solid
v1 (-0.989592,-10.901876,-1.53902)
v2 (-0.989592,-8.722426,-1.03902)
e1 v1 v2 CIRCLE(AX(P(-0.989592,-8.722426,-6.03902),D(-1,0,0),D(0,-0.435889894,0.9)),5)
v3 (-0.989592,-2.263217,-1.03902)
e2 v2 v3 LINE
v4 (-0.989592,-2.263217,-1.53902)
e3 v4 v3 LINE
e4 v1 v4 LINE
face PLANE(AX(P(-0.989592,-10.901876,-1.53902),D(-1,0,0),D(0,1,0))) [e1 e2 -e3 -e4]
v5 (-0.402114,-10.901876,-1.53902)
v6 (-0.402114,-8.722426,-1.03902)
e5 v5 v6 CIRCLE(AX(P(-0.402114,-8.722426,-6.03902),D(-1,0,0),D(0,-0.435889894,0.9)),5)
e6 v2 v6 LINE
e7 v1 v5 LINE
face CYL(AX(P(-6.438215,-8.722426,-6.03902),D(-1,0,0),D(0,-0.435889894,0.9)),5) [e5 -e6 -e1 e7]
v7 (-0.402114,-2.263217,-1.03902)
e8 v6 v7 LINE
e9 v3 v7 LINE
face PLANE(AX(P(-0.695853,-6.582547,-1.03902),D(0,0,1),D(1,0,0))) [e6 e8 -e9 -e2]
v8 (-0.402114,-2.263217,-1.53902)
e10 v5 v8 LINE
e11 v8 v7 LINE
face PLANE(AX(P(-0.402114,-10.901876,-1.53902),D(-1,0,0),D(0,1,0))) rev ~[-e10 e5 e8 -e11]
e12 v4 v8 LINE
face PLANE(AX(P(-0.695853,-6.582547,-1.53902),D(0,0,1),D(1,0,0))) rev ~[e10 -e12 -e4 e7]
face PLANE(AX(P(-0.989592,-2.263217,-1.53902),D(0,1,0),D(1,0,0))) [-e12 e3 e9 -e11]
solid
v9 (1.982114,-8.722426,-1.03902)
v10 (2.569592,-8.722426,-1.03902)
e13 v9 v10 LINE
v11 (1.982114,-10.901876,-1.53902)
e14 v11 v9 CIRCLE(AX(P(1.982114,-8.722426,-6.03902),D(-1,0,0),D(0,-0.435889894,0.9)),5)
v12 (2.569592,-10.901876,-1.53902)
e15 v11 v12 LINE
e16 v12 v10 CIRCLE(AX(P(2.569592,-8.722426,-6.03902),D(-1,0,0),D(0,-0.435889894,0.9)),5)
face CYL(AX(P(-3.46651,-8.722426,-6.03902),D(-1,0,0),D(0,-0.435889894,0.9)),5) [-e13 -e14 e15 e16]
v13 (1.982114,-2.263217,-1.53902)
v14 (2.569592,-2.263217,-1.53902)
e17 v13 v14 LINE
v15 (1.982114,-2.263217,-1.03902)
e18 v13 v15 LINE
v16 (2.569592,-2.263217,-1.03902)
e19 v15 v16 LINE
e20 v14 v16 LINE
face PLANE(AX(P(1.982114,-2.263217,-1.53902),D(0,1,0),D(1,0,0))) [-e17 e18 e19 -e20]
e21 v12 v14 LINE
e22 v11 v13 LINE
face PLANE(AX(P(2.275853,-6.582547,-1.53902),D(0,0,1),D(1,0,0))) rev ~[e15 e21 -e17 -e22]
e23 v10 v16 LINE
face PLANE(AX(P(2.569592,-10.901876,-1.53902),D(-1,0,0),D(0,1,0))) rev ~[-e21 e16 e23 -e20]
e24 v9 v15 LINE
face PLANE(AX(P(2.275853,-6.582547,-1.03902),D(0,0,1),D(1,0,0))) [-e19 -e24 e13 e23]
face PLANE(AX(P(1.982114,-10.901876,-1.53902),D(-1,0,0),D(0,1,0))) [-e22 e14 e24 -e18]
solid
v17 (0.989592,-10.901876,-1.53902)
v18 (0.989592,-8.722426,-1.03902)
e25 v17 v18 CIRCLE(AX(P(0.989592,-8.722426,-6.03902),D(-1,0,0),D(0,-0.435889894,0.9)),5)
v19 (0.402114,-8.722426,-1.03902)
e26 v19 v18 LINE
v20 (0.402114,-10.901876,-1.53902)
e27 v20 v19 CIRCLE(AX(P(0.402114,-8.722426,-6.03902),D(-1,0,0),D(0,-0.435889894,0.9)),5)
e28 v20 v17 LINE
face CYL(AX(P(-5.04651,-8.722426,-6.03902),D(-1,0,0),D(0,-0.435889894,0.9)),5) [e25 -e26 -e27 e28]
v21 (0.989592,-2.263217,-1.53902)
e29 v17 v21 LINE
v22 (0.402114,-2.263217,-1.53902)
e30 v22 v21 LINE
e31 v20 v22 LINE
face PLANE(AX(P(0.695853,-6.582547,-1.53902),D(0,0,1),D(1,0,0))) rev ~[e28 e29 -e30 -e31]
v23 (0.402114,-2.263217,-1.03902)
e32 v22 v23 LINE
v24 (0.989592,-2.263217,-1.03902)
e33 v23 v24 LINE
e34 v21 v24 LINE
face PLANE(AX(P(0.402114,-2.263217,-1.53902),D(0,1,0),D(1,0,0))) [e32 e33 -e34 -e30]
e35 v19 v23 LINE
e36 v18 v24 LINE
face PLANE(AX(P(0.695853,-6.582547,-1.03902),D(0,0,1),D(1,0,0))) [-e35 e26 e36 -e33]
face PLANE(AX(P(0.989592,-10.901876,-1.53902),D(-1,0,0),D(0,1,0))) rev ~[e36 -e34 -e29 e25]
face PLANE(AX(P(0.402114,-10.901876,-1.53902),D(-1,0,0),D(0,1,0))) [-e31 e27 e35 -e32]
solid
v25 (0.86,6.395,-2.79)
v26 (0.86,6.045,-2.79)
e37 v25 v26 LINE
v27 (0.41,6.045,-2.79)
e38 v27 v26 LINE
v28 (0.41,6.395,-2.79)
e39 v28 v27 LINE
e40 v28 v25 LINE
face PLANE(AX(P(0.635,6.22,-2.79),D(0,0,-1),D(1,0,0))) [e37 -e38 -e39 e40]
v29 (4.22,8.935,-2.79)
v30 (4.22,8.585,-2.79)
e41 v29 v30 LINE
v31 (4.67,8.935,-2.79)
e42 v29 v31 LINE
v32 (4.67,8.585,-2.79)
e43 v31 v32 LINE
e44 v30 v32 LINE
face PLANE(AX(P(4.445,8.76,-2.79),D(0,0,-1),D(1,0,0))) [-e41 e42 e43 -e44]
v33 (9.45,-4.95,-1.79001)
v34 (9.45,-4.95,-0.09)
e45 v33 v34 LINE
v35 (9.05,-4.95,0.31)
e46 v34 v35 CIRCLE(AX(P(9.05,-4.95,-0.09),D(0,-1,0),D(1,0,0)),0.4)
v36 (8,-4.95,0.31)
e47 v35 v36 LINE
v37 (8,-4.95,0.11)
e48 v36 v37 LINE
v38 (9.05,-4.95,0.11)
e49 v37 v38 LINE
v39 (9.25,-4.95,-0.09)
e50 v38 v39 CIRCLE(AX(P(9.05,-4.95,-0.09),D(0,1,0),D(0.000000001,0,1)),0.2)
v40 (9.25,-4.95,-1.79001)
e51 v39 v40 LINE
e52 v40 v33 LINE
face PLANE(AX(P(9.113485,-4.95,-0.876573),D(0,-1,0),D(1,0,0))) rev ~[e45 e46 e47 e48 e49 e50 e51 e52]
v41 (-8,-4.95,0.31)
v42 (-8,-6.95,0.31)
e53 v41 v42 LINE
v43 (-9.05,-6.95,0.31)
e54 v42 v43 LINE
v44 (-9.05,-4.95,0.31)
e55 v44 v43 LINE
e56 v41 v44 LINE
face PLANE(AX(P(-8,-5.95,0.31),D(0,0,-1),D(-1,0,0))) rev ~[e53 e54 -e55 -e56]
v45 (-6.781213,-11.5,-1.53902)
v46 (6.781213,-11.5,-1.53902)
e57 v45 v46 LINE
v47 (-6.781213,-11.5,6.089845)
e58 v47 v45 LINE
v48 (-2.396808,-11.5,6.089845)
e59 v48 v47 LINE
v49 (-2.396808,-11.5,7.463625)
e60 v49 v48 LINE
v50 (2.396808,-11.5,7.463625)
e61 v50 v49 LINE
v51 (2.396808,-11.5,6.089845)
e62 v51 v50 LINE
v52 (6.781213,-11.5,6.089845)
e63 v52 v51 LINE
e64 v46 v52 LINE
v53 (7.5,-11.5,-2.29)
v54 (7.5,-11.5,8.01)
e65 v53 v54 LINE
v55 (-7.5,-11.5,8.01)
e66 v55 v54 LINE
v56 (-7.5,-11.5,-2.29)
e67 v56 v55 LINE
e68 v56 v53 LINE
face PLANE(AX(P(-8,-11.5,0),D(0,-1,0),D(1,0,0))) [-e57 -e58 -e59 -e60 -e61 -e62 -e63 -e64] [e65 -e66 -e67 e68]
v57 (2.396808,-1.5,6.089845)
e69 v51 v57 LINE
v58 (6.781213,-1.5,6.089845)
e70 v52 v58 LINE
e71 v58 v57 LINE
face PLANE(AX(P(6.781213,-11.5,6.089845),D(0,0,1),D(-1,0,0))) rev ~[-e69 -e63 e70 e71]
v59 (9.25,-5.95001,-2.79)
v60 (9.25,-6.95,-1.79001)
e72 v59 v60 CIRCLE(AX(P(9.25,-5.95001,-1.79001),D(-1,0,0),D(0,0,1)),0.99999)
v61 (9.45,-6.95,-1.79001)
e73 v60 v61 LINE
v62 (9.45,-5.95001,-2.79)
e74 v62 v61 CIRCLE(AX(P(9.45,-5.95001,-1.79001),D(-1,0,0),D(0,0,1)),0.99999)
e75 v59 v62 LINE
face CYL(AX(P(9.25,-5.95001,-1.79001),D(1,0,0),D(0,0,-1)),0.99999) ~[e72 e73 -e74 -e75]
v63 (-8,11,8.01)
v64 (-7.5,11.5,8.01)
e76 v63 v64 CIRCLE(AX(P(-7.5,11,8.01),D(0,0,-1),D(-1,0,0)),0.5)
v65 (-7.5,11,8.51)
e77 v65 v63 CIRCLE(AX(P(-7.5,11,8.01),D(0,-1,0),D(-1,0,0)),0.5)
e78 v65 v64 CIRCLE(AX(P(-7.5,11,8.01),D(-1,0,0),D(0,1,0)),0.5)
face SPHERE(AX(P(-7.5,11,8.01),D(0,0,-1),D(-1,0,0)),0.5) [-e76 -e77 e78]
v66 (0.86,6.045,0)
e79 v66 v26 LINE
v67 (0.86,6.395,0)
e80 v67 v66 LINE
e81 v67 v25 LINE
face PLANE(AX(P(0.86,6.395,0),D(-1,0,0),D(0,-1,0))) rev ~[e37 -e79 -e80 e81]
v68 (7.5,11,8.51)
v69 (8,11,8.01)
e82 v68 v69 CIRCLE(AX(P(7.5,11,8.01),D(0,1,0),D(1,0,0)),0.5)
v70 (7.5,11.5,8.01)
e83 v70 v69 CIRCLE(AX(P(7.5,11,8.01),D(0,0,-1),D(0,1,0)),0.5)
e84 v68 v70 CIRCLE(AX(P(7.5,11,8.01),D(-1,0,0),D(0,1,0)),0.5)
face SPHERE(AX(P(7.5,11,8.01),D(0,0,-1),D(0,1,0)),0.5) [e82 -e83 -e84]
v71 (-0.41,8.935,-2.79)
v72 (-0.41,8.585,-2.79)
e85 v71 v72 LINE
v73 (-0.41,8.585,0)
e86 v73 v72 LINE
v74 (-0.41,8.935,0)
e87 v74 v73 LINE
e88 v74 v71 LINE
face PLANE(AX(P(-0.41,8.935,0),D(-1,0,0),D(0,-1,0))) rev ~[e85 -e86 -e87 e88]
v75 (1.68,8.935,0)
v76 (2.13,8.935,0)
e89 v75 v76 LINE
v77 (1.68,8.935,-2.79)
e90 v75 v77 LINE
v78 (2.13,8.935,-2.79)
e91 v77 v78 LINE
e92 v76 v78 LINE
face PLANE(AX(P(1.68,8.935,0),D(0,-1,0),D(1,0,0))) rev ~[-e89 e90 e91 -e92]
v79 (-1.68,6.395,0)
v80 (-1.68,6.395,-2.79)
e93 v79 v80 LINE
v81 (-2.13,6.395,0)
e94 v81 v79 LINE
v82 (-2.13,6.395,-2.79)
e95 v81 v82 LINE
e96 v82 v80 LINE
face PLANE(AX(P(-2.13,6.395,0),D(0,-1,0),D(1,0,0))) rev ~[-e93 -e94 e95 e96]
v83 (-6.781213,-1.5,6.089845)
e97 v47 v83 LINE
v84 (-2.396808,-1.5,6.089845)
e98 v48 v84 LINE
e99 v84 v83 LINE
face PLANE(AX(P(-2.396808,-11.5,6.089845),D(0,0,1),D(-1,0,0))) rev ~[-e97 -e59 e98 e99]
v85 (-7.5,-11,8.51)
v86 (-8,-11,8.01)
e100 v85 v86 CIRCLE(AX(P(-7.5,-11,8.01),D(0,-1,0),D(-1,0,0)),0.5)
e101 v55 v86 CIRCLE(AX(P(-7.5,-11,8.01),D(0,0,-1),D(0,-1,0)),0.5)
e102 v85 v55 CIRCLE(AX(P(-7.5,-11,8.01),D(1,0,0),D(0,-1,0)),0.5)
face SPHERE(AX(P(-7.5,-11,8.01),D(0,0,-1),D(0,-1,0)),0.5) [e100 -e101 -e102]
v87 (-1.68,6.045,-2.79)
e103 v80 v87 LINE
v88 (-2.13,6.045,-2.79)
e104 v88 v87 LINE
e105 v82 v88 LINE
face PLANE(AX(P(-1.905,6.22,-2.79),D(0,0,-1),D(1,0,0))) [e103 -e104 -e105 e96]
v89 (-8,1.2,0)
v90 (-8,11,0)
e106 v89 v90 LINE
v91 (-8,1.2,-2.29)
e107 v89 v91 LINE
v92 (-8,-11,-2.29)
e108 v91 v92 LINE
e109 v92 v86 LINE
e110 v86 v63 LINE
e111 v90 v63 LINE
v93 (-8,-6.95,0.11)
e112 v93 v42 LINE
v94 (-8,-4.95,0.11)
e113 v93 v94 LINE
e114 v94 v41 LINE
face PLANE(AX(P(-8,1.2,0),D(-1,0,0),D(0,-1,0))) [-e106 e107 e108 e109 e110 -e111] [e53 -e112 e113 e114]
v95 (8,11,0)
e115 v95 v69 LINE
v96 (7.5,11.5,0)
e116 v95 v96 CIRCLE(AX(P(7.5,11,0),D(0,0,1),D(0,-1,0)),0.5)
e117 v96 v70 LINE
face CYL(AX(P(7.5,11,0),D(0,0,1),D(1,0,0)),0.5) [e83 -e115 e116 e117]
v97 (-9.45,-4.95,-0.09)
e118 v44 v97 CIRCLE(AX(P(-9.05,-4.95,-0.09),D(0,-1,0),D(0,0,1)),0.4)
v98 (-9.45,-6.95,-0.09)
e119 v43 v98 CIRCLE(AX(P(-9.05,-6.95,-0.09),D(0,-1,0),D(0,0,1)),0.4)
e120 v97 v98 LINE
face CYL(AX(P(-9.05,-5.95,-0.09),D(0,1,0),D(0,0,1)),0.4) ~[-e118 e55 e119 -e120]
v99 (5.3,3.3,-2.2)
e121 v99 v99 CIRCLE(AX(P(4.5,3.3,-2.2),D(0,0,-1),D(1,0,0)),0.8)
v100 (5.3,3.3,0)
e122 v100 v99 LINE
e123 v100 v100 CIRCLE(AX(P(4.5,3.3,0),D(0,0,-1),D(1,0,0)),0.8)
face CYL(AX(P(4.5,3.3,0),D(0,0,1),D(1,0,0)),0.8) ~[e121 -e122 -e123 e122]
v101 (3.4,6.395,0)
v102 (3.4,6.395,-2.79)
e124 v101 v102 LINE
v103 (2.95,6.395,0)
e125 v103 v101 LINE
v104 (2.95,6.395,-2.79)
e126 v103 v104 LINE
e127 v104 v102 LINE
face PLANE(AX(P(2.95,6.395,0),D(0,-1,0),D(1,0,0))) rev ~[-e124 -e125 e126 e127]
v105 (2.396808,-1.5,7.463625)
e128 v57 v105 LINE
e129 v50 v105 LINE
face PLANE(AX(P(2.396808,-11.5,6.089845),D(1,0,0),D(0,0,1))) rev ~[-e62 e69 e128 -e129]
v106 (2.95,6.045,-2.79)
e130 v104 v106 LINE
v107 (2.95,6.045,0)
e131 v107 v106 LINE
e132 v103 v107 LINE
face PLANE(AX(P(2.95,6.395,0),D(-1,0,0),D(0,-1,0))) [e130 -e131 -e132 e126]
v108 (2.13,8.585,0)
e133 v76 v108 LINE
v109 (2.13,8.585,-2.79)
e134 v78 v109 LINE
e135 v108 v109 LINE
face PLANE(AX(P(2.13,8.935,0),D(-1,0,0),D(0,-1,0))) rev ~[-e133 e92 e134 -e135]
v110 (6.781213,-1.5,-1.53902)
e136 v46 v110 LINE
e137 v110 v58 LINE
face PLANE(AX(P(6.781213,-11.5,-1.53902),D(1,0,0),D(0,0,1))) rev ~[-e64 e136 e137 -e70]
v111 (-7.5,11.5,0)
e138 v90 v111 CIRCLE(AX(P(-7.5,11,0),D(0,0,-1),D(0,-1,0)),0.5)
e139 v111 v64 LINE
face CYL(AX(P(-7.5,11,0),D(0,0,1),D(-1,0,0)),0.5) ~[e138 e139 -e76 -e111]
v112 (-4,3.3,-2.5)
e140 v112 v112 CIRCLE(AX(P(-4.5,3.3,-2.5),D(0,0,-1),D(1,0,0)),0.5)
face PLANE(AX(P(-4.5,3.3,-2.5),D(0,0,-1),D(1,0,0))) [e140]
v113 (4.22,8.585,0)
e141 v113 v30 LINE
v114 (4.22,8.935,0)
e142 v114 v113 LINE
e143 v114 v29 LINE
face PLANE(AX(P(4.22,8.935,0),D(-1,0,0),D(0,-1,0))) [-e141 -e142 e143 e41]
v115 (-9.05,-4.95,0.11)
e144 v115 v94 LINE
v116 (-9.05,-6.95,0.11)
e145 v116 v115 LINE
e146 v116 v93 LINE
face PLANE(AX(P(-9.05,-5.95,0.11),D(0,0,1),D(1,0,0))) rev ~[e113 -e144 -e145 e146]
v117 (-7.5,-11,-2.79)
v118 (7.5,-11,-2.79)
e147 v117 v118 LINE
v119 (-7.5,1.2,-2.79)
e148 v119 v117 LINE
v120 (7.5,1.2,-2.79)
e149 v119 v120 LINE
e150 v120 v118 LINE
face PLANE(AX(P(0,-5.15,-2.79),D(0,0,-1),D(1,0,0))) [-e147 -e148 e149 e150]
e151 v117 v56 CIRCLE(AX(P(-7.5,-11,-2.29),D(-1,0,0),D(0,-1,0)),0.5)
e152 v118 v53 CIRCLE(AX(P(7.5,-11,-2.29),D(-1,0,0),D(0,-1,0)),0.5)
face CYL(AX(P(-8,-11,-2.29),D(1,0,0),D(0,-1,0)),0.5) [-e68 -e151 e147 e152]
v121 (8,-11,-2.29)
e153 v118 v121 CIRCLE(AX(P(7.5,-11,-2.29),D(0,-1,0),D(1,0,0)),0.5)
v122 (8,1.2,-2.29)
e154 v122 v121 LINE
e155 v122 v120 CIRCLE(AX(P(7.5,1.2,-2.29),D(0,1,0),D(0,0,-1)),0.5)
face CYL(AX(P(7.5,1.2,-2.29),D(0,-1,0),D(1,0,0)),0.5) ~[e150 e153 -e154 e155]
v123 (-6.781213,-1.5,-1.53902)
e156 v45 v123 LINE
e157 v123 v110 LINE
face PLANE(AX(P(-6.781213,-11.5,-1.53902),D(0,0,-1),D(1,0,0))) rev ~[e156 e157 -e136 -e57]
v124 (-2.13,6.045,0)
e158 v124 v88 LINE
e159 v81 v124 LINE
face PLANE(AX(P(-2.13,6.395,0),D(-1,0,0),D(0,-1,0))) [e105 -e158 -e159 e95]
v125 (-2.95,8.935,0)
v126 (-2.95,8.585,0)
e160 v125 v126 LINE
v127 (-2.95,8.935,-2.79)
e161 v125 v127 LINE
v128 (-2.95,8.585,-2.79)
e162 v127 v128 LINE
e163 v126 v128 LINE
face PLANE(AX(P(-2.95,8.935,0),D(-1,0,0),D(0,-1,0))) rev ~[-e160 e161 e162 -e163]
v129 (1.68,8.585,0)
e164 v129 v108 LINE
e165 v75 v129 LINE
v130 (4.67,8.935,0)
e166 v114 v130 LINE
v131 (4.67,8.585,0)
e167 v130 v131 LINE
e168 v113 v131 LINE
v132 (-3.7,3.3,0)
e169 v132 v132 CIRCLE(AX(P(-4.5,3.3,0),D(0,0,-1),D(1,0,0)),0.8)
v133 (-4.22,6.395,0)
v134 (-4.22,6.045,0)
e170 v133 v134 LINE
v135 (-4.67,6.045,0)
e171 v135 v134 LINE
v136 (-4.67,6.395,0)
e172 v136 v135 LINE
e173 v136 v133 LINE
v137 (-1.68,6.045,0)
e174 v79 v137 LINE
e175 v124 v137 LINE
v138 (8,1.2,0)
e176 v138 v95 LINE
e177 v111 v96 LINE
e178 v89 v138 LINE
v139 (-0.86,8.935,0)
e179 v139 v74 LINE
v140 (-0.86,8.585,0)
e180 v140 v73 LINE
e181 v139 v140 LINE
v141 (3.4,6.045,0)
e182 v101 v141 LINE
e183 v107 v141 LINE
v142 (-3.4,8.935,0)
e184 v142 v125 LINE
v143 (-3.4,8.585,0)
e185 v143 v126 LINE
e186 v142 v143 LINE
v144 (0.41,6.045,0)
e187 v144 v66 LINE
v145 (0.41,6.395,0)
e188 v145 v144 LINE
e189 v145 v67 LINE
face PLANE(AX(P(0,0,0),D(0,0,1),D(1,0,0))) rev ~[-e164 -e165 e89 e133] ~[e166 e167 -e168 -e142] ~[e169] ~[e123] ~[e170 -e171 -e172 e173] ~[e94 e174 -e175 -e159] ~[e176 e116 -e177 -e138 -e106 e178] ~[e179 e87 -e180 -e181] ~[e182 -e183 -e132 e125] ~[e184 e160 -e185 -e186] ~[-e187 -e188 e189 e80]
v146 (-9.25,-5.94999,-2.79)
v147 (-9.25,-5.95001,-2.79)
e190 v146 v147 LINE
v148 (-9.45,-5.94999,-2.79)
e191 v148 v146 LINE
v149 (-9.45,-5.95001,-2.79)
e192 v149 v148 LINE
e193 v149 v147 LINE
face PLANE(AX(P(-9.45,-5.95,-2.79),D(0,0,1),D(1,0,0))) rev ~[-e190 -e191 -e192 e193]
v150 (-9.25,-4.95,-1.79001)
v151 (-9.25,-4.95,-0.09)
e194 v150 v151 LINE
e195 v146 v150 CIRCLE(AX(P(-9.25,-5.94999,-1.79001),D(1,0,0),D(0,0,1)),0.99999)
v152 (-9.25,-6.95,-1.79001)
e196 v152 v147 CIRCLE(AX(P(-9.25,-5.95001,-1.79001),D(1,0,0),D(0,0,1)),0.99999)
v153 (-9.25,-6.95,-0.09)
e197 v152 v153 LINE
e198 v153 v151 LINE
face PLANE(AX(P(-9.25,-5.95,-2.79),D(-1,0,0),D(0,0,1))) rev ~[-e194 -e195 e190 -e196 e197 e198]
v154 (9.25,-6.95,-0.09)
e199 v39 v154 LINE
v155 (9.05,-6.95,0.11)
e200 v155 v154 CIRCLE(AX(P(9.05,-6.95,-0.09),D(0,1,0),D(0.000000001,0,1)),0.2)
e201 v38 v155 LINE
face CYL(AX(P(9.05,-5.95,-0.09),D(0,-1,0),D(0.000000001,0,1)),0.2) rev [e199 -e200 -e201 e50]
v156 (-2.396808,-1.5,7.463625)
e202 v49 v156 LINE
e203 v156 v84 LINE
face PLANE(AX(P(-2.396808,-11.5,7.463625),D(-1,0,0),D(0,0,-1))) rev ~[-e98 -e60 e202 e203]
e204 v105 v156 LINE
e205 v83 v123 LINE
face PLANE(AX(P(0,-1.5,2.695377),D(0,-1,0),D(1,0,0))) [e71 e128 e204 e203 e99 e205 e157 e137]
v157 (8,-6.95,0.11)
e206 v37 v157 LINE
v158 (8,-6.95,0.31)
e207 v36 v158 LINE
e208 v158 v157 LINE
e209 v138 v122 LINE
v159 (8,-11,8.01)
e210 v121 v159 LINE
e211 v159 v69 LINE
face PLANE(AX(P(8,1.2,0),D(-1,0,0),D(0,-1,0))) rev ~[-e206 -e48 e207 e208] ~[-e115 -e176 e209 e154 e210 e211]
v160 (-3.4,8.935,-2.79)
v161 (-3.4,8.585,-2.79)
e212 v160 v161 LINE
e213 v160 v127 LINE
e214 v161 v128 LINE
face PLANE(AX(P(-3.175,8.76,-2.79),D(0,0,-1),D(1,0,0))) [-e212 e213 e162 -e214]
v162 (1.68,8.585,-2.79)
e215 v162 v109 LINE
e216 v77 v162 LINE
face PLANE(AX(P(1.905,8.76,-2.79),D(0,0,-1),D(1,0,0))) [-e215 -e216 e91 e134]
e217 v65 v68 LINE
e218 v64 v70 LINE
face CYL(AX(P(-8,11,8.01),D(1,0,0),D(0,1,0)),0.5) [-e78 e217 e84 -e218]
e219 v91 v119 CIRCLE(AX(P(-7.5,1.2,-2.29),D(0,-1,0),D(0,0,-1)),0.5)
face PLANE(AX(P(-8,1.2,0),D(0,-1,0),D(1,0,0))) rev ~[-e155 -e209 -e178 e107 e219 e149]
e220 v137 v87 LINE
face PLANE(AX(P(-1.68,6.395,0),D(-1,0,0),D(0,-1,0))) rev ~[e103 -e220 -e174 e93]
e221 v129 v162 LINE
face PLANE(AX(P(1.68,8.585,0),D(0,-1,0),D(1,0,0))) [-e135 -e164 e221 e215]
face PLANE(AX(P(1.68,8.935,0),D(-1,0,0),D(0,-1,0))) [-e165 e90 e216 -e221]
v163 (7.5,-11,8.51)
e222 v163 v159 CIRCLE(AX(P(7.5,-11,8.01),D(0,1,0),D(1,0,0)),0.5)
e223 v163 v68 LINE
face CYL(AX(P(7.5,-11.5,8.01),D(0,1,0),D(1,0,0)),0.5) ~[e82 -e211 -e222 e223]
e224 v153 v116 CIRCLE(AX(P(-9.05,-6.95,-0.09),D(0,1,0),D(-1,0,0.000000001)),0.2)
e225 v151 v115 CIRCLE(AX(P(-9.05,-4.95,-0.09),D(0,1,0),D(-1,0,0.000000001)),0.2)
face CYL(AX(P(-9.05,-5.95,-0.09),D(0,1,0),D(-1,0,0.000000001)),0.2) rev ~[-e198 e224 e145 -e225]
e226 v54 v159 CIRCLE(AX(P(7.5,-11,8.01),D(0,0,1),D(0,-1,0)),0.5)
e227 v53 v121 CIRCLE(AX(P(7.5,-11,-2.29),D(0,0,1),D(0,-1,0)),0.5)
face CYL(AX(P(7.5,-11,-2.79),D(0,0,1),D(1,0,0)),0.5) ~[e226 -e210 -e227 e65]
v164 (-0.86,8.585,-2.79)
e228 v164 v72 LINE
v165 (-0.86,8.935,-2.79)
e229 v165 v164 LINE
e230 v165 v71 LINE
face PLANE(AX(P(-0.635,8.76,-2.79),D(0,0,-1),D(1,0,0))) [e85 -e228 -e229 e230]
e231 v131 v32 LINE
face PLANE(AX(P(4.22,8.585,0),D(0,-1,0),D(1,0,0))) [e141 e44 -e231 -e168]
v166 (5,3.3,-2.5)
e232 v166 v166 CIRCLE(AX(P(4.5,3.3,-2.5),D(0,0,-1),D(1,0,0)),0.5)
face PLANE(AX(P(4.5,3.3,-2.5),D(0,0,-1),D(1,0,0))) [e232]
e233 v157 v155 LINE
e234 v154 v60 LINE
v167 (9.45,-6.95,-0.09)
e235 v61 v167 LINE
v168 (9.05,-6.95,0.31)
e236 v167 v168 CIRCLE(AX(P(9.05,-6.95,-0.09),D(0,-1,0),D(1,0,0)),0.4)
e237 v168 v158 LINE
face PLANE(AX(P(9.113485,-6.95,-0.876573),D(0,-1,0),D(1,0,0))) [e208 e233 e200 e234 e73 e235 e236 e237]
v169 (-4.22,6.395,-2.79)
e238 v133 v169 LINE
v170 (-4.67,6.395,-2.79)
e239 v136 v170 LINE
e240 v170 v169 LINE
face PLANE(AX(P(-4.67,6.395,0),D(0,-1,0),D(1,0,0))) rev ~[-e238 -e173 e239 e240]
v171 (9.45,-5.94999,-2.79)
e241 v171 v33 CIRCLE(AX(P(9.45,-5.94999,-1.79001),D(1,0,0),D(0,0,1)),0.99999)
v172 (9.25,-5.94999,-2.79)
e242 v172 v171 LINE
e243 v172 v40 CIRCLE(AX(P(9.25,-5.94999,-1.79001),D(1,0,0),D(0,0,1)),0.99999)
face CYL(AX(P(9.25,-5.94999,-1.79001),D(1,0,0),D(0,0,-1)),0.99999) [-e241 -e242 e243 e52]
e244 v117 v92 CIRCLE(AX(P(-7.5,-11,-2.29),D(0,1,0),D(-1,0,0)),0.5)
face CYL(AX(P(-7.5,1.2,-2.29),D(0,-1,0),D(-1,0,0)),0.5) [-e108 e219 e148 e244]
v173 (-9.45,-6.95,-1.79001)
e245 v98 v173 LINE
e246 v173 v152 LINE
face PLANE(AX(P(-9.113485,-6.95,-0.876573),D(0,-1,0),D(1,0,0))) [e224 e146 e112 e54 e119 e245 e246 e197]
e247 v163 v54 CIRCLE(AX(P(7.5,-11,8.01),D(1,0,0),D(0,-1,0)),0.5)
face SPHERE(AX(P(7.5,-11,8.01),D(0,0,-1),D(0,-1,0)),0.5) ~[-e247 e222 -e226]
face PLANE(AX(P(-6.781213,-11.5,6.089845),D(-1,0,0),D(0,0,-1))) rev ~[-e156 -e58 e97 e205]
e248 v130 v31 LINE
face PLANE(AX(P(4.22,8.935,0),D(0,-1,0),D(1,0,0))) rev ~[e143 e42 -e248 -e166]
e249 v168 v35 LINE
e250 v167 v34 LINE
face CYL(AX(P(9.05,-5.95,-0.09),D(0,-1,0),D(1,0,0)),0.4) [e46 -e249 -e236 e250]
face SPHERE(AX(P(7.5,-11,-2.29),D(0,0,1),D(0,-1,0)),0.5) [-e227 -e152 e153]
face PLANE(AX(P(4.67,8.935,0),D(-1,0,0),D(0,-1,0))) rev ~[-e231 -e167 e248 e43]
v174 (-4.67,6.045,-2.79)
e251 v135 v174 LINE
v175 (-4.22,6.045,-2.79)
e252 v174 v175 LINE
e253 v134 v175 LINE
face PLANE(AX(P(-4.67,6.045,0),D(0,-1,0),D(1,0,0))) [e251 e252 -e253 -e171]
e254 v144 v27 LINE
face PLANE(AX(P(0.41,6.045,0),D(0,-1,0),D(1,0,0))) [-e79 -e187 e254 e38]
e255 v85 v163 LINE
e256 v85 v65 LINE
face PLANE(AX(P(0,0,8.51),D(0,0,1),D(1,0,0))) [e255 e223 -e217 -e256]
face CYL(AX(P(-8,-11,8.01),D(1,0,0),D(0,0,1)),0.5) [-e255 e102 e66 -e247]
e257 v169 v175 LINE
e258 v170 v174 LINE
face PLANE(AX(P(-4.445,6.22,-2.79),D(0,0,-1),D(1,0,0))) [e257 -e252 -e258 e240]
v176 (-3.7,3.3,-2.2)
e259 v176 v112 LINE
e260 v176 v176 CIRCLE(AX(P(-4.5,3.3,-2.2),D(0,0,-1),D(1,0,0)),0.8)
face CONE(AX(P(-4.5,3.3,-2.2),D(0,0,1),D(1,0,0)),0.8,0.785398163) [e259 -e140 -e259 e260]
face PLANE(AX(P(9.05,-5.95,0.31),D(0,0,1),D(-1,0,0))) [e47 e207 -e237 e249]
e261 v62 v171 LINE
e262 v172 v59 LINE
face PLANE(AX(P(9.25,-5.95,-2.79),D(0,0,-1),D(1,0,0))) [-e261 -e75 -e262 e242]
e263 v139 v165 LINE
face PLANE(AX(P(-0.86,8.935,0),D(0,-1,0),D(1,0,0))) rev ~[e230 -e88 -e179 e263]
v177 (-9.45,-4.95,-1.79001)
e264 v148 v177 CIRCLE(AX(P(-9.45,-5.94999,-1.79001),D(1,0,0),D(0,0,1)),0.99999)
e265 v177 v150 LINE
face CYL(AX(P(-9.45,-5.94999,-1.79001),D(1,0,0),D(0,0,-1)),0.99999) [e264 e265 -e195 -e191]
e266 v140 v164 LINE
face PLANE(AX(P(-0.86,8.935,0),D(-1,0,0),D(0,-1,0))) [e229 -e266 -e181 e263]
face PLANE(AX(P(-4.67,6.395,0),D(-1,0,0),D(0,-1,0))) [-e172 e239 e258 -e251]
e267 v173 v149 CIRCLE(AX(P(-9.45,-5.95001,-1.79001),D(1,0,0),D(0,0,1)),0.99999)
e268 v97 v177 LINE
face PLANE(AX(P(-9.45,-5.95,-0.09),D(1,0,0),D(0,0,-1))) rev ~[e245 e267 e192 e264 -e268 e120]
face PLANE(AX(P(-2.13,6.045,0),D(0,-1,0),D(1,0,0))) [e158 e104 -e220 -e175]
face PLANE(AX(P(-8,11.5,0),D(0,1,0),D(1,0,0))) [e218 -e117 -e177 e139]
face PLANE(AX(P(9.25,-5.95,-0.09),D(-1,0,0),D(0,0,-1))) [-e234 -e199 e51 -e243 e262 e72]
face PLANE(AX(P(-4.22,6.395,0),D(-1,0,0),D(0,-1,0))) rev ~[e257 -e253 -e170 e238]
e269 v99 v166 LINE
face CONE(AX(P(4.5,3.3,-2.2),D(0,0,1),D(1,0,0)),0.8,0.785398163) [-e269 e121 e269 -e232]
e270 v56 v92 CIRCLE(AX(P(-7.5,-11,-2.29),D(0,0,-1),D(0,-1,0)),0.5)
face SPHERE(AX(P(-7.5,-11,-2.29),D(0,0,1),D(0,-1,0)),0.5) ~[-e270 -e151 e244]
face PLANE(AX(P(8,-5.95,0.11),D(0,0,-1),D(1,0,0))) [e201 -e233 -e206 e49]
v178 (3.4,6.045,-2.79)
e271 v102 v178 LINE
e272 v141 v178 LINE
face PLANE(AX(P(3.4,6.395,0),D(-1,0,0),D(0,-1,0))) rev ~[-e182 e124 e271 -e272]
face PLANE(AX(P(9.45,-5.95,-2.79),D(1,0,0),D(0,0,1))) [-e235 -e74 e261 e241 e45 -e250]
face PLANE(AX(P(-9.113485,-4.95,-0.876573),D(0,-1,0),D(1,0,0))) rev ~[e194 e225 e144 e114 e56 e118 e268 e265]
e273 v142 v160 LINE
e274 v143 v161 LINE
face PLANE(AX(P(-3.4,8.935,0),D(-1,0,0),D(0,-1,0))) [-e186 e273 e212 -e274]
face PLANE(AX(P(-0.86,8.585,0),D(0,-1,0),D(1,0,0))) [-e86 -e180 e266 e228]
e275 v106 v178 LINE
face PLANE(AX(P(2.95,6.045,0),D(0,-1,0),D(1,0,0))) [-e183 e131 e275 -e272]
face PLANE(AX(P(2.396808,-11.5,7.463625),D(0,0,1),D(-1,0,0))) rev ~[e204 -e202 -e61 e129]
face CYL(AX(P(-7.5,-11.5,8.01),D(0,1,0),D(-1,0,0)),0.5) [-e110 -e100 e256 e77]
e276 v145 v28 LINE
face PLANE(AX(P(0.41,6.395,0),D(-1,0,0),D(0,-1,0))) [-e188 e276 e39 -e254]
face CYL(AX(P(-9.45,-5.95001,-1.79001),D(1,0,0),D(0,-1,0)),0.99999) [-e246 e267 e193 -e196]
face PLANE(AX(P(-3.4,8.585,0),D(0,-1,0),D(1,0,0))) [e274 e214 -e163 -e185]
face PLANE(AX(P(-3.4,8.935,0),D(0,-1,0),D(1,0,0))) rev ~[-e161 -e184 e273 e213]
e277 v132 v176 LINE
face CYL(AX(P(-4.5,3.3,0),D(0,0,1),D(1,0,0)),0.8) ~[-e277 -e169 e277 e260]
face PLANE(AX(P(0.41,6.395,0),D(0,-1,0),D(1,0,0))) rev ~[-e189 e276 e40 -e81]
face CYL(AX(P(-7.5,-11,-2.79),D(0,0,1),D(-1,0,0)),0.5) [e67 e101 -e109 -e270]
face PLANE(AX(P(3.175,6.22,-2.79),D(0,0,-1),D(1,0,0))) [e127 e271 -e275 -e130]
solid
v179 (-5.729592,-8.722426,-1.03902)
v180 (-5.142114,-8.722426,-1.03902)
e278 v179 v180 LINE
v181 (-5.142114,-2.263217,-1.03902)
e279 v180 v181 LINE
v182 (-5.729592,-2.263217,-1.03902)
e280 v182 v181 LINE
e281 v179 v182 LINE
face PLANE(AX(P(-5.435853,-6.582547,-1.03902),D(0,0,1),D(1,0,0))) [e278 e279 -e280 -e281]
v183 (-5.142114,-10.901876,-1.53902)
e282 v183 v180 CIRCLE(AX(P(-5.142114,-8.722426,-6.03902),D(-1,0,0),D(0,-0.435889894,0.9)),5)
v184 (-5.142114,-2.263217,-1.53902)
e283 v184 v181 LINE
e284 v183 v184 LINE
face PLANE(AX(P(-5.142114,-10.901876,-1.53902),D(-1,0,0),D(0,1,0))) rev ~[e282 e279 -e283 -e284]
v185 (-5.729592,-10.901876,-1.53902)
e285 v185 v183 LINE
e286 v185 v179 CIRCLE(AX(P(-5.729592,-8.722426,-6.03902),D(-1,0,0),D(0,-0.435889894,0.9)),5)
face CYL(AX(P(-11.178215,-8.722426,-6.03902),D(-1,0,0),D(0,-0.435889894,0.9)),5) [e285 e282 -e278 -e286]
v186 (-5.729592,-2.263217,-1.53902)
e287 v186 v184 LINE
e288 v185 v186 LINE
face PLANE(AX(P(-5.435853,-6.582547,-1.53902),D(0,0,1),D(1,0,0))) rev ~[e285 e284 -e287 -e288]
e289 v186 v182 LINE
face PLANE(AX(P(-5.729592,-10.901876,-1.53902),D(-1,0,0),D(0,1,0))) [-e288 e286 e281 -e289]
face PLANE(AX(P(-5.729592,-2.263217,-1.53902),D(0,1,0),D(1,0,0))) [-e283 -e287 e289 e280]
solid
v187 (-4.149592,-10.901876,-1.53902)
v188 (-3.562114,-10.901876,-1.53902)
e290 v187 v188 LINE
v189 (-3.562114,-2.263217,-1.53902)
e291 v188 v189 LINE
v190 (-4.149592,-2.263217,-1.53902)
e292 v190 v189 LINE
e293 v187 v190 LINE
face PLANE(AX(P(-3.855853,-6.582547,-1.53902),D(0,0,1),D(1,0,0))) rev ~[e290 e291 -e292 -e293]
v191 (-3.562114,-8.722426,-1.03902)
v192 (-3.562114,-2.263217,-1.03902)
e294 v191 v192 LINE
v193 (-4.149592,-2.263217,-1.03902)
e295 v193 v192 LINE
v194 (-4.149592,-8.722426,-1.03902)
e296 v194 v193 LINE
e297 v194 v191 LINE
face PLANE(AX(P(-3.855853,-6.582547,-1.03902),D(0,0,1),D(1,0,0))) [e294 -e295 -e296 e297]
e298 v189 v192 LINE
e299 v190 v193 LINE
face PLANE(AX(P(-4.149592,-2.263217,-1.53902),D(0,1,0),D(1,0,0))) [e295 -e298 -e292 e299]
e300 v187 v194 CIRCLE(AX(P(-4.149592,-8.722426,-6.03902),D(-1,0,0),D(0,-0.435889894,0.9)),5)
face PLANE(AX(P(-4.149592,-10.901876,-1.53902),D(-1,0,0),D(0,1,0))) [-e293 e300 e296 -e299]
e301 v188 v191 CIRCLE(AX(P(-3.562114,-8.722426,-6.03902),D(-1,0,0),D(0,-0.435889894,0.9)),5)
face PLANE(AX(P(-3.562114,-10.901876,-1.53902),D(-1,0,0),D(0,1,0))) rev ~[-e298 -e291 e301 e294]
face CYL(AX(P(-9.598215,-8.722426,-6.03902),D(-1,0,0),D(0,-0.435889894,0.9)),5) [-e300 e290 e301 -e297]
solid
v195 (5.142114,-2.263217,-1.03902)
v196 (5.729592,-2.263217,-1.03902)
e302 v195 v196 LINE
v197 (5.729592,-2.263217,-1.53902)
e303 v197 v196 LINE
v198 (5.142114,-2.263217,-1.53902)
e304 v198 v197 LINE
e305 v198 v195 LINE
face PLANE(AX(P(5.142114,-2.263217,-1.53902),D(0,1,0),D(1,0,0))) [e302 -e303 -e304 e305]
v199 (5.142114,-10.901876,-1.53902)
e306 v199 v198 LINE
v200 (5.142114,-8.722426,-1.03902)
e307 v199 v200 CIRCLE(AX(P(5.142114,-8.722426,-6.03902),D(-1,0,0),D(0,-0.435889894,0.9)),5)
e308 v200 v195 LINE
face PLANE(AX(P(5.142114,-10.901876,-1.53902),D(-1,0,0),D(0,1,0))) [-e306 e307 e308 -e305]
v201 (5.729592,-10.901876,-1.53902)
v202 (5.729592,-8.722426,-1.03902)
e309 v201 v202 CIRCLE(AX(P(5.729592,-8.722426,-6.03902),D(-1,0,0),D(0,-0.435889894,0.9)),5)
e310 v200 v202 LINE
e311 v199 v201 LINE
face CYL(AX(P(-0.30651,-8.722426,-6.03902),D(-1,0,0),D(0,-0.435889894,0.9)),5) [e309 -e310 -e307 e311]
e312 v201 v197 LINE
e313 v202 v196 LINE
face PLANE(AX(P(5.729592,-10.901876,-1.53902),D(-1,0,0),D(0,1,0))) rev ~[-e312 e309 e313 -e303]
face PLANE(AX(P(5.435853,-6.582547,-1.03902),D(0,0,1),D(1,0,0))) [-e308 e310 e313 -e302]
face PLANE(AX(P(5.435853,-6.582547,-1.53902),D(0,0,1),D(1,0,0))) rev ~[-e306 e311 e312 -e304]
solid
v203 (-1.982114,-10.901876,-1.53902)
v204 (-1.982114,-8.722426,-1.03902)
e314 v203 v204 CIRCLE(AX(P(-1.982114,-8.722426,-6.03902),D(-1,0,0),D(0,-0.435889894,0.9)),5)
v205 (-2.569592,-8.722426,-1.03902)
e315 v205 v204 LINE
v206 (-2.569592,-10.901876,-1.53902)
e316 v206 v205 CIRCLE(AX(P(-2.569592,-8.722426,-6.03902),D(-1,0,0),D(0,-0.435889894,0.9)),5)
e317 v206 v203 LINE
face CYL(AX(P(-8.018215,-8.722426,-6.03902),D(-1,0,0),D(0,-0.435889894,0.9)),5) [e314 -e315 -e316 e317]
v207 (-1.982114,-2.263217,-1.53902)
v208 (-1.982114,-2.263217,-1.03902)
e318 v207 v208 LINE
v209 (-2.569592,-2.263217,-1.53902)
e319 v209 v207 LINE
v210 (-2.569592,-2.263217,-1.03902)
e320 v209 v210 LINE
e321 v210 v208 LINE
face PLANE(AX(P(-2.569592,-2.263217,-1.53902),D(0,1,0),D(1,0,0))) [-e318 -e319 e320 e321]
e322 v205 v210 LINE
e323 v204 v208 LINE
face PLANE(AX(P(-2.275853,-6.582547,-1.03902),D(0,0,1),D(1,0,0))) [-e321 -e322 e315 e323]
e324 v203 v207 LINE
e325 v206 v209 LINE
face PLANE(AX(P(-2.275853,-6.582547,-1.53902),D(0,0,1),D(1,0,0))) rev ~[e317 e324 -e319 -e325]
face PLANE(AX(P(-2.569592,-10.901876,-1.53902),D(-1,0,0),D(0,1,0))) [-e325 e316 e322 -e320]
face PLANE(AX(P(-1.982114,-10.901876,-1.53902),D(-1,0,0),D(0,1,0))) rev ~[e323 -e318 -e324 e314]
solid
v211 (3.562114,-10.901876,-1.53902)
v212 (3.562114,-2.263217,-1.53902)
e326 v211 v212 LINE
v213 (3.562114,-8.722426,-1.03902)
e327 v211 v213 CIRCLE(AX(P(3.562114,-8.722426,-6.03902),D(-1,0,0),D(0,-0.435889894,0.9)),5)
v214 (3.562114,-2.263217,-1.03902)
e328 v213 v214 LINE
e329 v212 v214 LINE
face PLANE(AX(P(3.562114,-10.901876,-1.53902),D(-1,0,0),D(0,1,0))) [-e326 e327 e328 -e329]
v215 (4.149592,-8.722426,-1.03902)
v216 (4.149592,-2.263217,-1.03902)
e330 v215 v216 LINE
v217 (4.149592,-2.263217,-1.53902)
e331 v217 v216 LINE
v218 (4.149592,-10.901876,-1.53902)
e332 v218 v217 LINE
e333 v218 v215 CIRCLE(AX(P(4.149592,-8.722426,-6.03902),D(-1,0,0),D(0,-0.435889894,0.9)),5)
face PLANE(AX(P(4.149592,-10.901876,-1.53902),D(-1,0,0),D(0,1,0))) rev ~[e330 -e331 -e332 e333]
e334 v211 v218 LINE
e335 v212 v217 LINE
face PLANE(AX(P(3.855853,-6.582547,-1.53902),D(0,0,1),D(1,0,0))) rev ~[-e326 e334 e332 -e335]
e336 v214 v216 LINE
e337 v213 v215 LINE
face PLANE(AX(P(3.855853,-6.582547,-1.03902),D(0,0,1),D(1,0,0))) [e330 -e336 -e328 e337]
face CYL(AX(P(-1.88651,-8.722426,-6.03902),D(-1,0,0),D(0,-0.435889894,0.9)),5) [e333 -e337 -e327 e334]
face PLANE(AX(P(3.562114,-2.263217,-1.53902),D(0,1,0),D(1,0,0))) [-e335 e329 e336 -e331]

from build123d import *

# Parameters (mm, degrees)
F0_W           = 16
F0_H           = 23
F1_DEPTH       = 8.51
F2_W           = 16
F2_H           = 12.7
F3_DEPTH       = 2.79
F4_R           = 0.5
F5_R           = 0.8
F6_DEPTH       = 2.5
F7_SIZE        = 0.3
F9_DEPTH       = 10
F10_W          = 0.5874776107
F10_H          = 8.6386585608
F11_DEPTH      = 0.5
F12_T1_DEPTH   = 11.4847249695
F12_2_T1_DEPTH = 11.4847249695
F12_3_T1_DEPTH = 11.4847249695
F12_4_T1_DEPTH = 11.4847249695
F12_5_T1_DEPTH = 11.4847249695
F12_6_T1_DEPTH = 11.4847249695
F12_7_T1_DEPTH = 11.4847249695
F12_8_T1_DEPTH = 11.4847249695
F13_W          = 0.45
F13_H          = 0.35
F14_DEPTH      = 2.79
F17_DEPTH      = 1
F17_DEPTH_BACK = 1
F18_R          = 0.99999


# Not quite as in the source:
# - a fillet or chamfer that OpenCascade refuses, or shapes differently, is made with other operations: its cross-section is extruded or revolved along the edge and cut away or added
# - a fillet or chamfer is up to 0.001 mm smaller than in the source, because OpenCascade refuses the exact size


with BuildPart() as f1:
    # F0 (on Top) → F1 (new body)
    with BuildSketch(Plane.XY):
        Rectangle(F0_W, F0_H)
    extrude(amount=F1_DEPTH)

    # F2 (on face) → F3 (join)
    with BuildSketch(Plane(origin=(0, 0, 0), x_dir=(1, 0, 0), z_dir=(0, 0, -1))):
        with Locations((0, 5.15)):
            Rectangle(F2_W, F2_H)
    extrude(amount=F3_DEPTH)

    # F4
    f4_edges = [f1.edges().sort_by_distance(p)[0] for p in [
        (-8, -11.5, 2.86),
        (8, -11.5, 2.86),
        (8, 11.5, 4.255),
        (-8, 11.5, 4.255),
        (0, -11.5, 8.51),
        (-8, 0, 8.51),
        (0, 11.5, 8.51),
        (8, 0, 8.51),
        (0, -11.5, -2.79),
        (-8, -5.15, -2.79),
        (8, -5.15, -2.79),
    ]]
    fillet(f4_edges, radius=F4_R)

    # F5 (on face) → F6 (join)
    with BuildSketch(Plane(origin=(0, 0, 0), x_dir=(1, 0, 0), z_dir=(0, 0, -1))):
        with Locations((4.5, -3.3)):
            Circle(F5_R)
        with Locations((-4.5, -3.3)):
            Circle(F5_R)
    extrude(amount=F6_DEPTH)

    # F7
    f7_edges = [f1.edges().sort_by_distance(p)[0] for p in [
        (3.7, 3.3, -2.5),
        (-5.3, 3.3, -2.5),
    ]]
    chamfer(f7_edges, length=F7_SIZE)

    # F8 (on face) → F9 (cut)
    with BuildSketch(Plane.XZ.offset(11.5)):
        Polygon((2.3968075402, 7.4636251666), (0, 7.4636251666), (-2.3968075402, 7.4636251666), (-2.3968075402, 6.0898447409), (-6.7812129855, 6.0898447409), (-6.7812129855, -1.5390195185), (0, -1.5390195185), (6.7812129855, -1.5390195185), (6.7812129855, 6.0898447409), (2.3968075402, 6.0898447409), align=None)
    extrude(amount=-F9_DEPTH, mode=Mode.SUBTRACT)

    # F13 (on face) → F14 (join)
    with BuildSketch(Plane(origin=(0, 0, 0), x_dir=(1, 0, 0), z_dir=(0, 0, -1))):
        with Locations((4.445, -8.76)):
            Rectangle(F13_W, F13_H)
        with Locations((1.905, -8.76)):
            Rectangle(F13_W, F13_H)
        with Locations((-0.635, -8.76)):
            Rectangle(F13_W, F13_H)
        with Locations((-3.175, -8.76)):
            Rectangle(F13_W, F13_H)
        with Locations((3.175, -6.22)):
            Rectangle(F13_W, F13_H)
        with Locations((0.635, -6.22)):
            Rectangle(F13_W, F13_H)
        with Locations((-1.905, -6.22)):
            Rectangle(F13_W, F13_H)
        with Locations((-4.445, -6.22)):
            Rectangle(F13_W, F13_H)
    extrude(amount=F14_DEPTH)

    # F16 (on offset) → F17 (join, two sides)
    with BuildSketch(Plane.XZ.offset(5.95)) as f17_sk:
        with BuildLine():
            Line((9.05, 0.31), (8, 0.31))
            Line((8, 0.31), (8, 0.11))
            Line((8, 0.11), (9.05, 0.11))
            ThreePointArc((9.05, 0.11), (9.1914213562, 0.0514213562), (9.25, -0.09))
            Line((9.25, -0.09), (9.25, -2.79))
            Line((9.25, -2.79), (9.45, -2.79))
            Line((9.45, -2.79), (9.45, -0.09))
            ThreePointArc((9.45, -0.09), (9.3328427125, 0.1928427125), (9.05, 0.31))
        make_face()
        with BuildLine():
            Line((-9.45, -2.79), (-9.25, -2.79))
            Line((-9.25, -2.79), (-9.25, -0.09))
            ThreePointArc((-9.25, -0.09), (-9.1914213562, 0.0514213562), (-9.05, 0.11))
            Line((-9.05, 0.11), (-8, 0.11))
            Line((-8, 0.11), (-8, 0.31))
            Line((-8, 0.31), (-9.05, 0.31))
            ThreePointArc((-9.05, 0.31), (-9.3328427125, 0.1928427125), (-9.45, -0.09))
            Line((-9.45, -0.09), (-9.45, -2.79))
        make_face()
    extrude(amount=F17_DEPTH)
    extrude(f17_sk.sketch, amount=-F17_DEPTH_BACK)

    # F18 (radius 1 in the source; OpenCascade refuses exactly that, so slightly less here)
    f18_edges = [f1.edges().sort_by_distance(p)[0] for p in [
        (9.35, -6.95, -2.79),
        (9.35, -4.95, -2.79),
        (-9.35, -6.95, -2.79),
        (-9.35, -4.95, -2.79),
    ]]
    fillet(f18_edges, radius=F18_R)


with BuildPart() as f11:
    # F10 (on face) → F11 (new body)
    with BuildSketch(Plane.XY.offset(-1.5390195185)):
        with Locations((0.6958528975, -6.5825465135)):
            Rectangle(F10_W, F10_H)
    extrude(amount=F11_DEPTH)

    # F12: fillet of radius 5 on 1 edges, made by hand

    # F12_s2 → F12_t1 (cut)
    with BuildSketch(Plane.YZ.offset(-5.0465095873)):
        with BuildLine():
            ThreePointArc((-10.9018757939, -1.5390195185), (-9.8404603109, -1.1656223461), (-8.7224263222, -1.0390195185))
            Line((-8.7224263222, -1.0390195185), (-10.9018757939, -1.0390195185))
            Line((-10.9018757939, -1.0390195185), (-10.9018757939, -1.5390195185))
        make_face()
    extrude(amount=F12_T1_DEPTH, mode=Mode.SUBTRACT)


with BuildPart() as f11b:
    # F10 (on face) → F11, piece 2 (new body)
    with BuildSketch(Plane.XY.offset(-1.5390195185)):
        with Locations((2.2758528975, -6.5825465135)):
            Rectangle(F10_W, F10_H)
    extrude(amount=F11_DEPTH)

    # F12#2: fillet of radius 5 on 1 edges, made by hand

    # F12_2_s2 → F12_2_t1 (cut)
    with BuildSketch(Plane.YZ.offset(-3.4665095873)):
        with BuildLine():
            ThreePointArc((-10.9018757939, -1.5390195185), (-9.8404603109, -1.1656223461), (-8.7224263222, -1.0390195185))
            Line((-8.7224263222, -1.0390195185), (-10.9018757939, -1.0390195185))
            Line((-10.9018757939, -1.0390195185), (-10.9018757939, -1.5390195185))
        make_face()
    extrude(amount=F12_2_T1_DEPTH, mode=Mode.SUBTRACT)


with BuildPart() as f11c:
    # F10 (on face) → F11, piece 3 (new body)
    with BuildSketch(Plane.XY.offset(-1.5390195185)):
        with Locations((3.8558528975, -6.5825465135)):
            Rectangle(F10_W, F10_H)
    extrude(amount=F11_DEPTH)

    # F12#3: fillet of radius 5 on 1 edges, made by hand

    # F12_3_s2 → F12_3_t1 (cut)
    with BuildSketch(Plane.YZ.offset(-1.8865095873)):
        with BuildLine():
            ThreePointArc((-10.9018757939, -1.5390195185), (-9.8404603109, -1.1656223461), (-8.7224263222, -1.0390195185))
            Line((-8.7224263222, -1.0390195185), (-10.9018757939, -1.0390195185))
            Line((-10.9018757939, -1.0390195185), (-10.9018757939, -1.5390195185))
        make_face()
    extrude(amount=F12_3_T1_DEPTH, mode=Mode.SUBTRACT)


with BuildPart() as f11d:
    # F10 (on face) → F11, piece 4 (new body)
    with BuildSketch(Plane.XY.offset(-1.5390195185)):
        with Locations((5.4358528975, -6.5825465135)):
            Rectangle(F10_W, F10_H)
    extrude(amount=F11_DEPTH)

    # F12#4: fillet of radius 5 on 1 edges, made by hand

    # F12_4_s2 → F12_4_t1 (cut)
    with BuildSketch(Plane.YZ.offset(-0.3065095873)):
        with BuildLine():
            ThreePointArc((-10.9018757939, -1.5390195185), (-9.8404603109, -1.1656223461), (-8.7224263222, -1.0390195185))
            Line((-8.7224263222, -1.0390195185), (-10.9018757939, -1.0390195185))
            Line((-10.9018757939, -1.0390195185), (-10.9018757939, -1.5390195185))
        make_face()
    extrude(amount=F12_4_T1_DEPTH, mode=Mode.SUBTRACT)


with BuildPart() as f11e:
    # F10 (on face) → F11, piece 5 (new body)
    with BuildSketch(Plane.XY.offset(-1.5390195185)):
        with Locations((-0.6958528975, -6.5825465135)):
            Rectangle(F10_W, F10_H)
    extrude(amount=F11_DEPTH)

    # F12#5: fillet of radius 5 on 1 edges, made by hand

    # F12_5_s2 → F12_5_t1 (cut)
    with BuildSketch(Plane.YZ.offset(-6.4382153822)):
        with BuildLine():
            ThreePointArc((-10.9018757939, -1.5390195185), (-9.8404603109, -1.1656223461), (-8.7224263222, -1.0390195185))
            Line((-8.7224263222, -1.0390195185), (-10.9018757939, -1.0390195185))
            Line((-10.9018757939, -1.0390195185), (-10.9018757939, -1.5390195185))
        make_face()
    extrude(amount=F12_5_T1_DEPTH, mode=Mode.SUBTRACT)


with BuildPart() as f11f:
    # F10 (on face) → F11, piece 6 (new body)
    with BuildSketch(Plane.XY.offset(-1.5390195185)):
        with Locations((-3.8558528975, -6.5825465135)):
            Rectangle(F10_W, F10_H)
    extrude(amount=F11_DEPTH)

    # F12#6: fillet of radius 5 on 1 edges, made by hand

    # F12_6_s2 → F12_6_t1 (cut)
    with BuildSketch(Plane.YZ.offset(-9.5982153822)):
        with BuildLine():
            ThreePointArc((-10.9018757939, -1.5390195185), (-9.8404603109, -1.1656223461), (-8.7224263222, -1.0390195185))
            Line((-8.7224263222, -1.0390195185), (-10.9018757939, -1.0390195185))
            Line((-10.9018757939, -1.0390195185), (-10.9018757939, -1.5390195185))
        make_face()
    extrude(amount=F12_6_T1_DEPTH, mode=Mode.SUBTRACT)


with BuildPart() as f11g:
    # F10 (on face) → F11, piece 7 (new body)
    with BuildSketch(Plane.XY.offset(-1.5390195185)):
        with Locations((-2.2758528975, -6.5825465135)):
            Rectangle(F10_W, F10_H)
    extrude(amount=F11_DEPTH)

    # F12#7: fillet of radius 5 on 1 edges, made by hand

    # F12_7_s2 → F12_7_t1 (cut)
    with BuildSketch(Plane.YZ.offset(-8.0182153822)):
        with BuildLine():
            ThreePointArc((-10.9018757939, -1.5390195185), (-9.8404603109, -1.1656223461), (-8.7224263222, -1.0390195185))
            Line((-8.7224263222, -1.0390195185), (-10.9018757939, -1.0390195185))
            Line((-10.9018757939, -1.0390195185), (-10.9018757939, -1.5390195185))
        make_face()
    extrude(amount=F12_7_T1_DEPTH, mode=Mode.SUBTRACT)


with BuildPart() as f11h:
    # F10 (on face) → F11, piece 8 (new body)
    with BuildSketch(Plane.XY.offset(-1.5390195185)):
        with Locations((-5.4358528975, -6.5825465135)):
            Rectangle(F10_W, F10_H)
    extrude(amount=F11_DEPTH)

    # F12#8: fillet of radius 5 on 1 edges, made by hand

    # F12_8_s2 → F12_8_t1 (cut)
    with BuildSketch(Plane.YZ.offset(-11.1782153822)):
        with BuildLine():
            ThreePointArc((-10.9018757939, -1.5390195185), (-9.8404603109, -1.1656223461), (-8.7224263222, -1.0390195185))
            Line((-8.7224263222, -1.0390195185), (-10.9018757939, -1.0390195185))
            Line((-10.9018757939, -1.0390195185), (-10.9018757939, -1.5390195185))
        make_face()
    extrude(amount=F12_8_T1_DEPTH, mode=Mode.SUBTRACT)


solid = Compound([f1.part, f11.part, f11b.part, f11c.part, f11d.part, f11e.part, f11f.part, f11g.part, f11h.part])
